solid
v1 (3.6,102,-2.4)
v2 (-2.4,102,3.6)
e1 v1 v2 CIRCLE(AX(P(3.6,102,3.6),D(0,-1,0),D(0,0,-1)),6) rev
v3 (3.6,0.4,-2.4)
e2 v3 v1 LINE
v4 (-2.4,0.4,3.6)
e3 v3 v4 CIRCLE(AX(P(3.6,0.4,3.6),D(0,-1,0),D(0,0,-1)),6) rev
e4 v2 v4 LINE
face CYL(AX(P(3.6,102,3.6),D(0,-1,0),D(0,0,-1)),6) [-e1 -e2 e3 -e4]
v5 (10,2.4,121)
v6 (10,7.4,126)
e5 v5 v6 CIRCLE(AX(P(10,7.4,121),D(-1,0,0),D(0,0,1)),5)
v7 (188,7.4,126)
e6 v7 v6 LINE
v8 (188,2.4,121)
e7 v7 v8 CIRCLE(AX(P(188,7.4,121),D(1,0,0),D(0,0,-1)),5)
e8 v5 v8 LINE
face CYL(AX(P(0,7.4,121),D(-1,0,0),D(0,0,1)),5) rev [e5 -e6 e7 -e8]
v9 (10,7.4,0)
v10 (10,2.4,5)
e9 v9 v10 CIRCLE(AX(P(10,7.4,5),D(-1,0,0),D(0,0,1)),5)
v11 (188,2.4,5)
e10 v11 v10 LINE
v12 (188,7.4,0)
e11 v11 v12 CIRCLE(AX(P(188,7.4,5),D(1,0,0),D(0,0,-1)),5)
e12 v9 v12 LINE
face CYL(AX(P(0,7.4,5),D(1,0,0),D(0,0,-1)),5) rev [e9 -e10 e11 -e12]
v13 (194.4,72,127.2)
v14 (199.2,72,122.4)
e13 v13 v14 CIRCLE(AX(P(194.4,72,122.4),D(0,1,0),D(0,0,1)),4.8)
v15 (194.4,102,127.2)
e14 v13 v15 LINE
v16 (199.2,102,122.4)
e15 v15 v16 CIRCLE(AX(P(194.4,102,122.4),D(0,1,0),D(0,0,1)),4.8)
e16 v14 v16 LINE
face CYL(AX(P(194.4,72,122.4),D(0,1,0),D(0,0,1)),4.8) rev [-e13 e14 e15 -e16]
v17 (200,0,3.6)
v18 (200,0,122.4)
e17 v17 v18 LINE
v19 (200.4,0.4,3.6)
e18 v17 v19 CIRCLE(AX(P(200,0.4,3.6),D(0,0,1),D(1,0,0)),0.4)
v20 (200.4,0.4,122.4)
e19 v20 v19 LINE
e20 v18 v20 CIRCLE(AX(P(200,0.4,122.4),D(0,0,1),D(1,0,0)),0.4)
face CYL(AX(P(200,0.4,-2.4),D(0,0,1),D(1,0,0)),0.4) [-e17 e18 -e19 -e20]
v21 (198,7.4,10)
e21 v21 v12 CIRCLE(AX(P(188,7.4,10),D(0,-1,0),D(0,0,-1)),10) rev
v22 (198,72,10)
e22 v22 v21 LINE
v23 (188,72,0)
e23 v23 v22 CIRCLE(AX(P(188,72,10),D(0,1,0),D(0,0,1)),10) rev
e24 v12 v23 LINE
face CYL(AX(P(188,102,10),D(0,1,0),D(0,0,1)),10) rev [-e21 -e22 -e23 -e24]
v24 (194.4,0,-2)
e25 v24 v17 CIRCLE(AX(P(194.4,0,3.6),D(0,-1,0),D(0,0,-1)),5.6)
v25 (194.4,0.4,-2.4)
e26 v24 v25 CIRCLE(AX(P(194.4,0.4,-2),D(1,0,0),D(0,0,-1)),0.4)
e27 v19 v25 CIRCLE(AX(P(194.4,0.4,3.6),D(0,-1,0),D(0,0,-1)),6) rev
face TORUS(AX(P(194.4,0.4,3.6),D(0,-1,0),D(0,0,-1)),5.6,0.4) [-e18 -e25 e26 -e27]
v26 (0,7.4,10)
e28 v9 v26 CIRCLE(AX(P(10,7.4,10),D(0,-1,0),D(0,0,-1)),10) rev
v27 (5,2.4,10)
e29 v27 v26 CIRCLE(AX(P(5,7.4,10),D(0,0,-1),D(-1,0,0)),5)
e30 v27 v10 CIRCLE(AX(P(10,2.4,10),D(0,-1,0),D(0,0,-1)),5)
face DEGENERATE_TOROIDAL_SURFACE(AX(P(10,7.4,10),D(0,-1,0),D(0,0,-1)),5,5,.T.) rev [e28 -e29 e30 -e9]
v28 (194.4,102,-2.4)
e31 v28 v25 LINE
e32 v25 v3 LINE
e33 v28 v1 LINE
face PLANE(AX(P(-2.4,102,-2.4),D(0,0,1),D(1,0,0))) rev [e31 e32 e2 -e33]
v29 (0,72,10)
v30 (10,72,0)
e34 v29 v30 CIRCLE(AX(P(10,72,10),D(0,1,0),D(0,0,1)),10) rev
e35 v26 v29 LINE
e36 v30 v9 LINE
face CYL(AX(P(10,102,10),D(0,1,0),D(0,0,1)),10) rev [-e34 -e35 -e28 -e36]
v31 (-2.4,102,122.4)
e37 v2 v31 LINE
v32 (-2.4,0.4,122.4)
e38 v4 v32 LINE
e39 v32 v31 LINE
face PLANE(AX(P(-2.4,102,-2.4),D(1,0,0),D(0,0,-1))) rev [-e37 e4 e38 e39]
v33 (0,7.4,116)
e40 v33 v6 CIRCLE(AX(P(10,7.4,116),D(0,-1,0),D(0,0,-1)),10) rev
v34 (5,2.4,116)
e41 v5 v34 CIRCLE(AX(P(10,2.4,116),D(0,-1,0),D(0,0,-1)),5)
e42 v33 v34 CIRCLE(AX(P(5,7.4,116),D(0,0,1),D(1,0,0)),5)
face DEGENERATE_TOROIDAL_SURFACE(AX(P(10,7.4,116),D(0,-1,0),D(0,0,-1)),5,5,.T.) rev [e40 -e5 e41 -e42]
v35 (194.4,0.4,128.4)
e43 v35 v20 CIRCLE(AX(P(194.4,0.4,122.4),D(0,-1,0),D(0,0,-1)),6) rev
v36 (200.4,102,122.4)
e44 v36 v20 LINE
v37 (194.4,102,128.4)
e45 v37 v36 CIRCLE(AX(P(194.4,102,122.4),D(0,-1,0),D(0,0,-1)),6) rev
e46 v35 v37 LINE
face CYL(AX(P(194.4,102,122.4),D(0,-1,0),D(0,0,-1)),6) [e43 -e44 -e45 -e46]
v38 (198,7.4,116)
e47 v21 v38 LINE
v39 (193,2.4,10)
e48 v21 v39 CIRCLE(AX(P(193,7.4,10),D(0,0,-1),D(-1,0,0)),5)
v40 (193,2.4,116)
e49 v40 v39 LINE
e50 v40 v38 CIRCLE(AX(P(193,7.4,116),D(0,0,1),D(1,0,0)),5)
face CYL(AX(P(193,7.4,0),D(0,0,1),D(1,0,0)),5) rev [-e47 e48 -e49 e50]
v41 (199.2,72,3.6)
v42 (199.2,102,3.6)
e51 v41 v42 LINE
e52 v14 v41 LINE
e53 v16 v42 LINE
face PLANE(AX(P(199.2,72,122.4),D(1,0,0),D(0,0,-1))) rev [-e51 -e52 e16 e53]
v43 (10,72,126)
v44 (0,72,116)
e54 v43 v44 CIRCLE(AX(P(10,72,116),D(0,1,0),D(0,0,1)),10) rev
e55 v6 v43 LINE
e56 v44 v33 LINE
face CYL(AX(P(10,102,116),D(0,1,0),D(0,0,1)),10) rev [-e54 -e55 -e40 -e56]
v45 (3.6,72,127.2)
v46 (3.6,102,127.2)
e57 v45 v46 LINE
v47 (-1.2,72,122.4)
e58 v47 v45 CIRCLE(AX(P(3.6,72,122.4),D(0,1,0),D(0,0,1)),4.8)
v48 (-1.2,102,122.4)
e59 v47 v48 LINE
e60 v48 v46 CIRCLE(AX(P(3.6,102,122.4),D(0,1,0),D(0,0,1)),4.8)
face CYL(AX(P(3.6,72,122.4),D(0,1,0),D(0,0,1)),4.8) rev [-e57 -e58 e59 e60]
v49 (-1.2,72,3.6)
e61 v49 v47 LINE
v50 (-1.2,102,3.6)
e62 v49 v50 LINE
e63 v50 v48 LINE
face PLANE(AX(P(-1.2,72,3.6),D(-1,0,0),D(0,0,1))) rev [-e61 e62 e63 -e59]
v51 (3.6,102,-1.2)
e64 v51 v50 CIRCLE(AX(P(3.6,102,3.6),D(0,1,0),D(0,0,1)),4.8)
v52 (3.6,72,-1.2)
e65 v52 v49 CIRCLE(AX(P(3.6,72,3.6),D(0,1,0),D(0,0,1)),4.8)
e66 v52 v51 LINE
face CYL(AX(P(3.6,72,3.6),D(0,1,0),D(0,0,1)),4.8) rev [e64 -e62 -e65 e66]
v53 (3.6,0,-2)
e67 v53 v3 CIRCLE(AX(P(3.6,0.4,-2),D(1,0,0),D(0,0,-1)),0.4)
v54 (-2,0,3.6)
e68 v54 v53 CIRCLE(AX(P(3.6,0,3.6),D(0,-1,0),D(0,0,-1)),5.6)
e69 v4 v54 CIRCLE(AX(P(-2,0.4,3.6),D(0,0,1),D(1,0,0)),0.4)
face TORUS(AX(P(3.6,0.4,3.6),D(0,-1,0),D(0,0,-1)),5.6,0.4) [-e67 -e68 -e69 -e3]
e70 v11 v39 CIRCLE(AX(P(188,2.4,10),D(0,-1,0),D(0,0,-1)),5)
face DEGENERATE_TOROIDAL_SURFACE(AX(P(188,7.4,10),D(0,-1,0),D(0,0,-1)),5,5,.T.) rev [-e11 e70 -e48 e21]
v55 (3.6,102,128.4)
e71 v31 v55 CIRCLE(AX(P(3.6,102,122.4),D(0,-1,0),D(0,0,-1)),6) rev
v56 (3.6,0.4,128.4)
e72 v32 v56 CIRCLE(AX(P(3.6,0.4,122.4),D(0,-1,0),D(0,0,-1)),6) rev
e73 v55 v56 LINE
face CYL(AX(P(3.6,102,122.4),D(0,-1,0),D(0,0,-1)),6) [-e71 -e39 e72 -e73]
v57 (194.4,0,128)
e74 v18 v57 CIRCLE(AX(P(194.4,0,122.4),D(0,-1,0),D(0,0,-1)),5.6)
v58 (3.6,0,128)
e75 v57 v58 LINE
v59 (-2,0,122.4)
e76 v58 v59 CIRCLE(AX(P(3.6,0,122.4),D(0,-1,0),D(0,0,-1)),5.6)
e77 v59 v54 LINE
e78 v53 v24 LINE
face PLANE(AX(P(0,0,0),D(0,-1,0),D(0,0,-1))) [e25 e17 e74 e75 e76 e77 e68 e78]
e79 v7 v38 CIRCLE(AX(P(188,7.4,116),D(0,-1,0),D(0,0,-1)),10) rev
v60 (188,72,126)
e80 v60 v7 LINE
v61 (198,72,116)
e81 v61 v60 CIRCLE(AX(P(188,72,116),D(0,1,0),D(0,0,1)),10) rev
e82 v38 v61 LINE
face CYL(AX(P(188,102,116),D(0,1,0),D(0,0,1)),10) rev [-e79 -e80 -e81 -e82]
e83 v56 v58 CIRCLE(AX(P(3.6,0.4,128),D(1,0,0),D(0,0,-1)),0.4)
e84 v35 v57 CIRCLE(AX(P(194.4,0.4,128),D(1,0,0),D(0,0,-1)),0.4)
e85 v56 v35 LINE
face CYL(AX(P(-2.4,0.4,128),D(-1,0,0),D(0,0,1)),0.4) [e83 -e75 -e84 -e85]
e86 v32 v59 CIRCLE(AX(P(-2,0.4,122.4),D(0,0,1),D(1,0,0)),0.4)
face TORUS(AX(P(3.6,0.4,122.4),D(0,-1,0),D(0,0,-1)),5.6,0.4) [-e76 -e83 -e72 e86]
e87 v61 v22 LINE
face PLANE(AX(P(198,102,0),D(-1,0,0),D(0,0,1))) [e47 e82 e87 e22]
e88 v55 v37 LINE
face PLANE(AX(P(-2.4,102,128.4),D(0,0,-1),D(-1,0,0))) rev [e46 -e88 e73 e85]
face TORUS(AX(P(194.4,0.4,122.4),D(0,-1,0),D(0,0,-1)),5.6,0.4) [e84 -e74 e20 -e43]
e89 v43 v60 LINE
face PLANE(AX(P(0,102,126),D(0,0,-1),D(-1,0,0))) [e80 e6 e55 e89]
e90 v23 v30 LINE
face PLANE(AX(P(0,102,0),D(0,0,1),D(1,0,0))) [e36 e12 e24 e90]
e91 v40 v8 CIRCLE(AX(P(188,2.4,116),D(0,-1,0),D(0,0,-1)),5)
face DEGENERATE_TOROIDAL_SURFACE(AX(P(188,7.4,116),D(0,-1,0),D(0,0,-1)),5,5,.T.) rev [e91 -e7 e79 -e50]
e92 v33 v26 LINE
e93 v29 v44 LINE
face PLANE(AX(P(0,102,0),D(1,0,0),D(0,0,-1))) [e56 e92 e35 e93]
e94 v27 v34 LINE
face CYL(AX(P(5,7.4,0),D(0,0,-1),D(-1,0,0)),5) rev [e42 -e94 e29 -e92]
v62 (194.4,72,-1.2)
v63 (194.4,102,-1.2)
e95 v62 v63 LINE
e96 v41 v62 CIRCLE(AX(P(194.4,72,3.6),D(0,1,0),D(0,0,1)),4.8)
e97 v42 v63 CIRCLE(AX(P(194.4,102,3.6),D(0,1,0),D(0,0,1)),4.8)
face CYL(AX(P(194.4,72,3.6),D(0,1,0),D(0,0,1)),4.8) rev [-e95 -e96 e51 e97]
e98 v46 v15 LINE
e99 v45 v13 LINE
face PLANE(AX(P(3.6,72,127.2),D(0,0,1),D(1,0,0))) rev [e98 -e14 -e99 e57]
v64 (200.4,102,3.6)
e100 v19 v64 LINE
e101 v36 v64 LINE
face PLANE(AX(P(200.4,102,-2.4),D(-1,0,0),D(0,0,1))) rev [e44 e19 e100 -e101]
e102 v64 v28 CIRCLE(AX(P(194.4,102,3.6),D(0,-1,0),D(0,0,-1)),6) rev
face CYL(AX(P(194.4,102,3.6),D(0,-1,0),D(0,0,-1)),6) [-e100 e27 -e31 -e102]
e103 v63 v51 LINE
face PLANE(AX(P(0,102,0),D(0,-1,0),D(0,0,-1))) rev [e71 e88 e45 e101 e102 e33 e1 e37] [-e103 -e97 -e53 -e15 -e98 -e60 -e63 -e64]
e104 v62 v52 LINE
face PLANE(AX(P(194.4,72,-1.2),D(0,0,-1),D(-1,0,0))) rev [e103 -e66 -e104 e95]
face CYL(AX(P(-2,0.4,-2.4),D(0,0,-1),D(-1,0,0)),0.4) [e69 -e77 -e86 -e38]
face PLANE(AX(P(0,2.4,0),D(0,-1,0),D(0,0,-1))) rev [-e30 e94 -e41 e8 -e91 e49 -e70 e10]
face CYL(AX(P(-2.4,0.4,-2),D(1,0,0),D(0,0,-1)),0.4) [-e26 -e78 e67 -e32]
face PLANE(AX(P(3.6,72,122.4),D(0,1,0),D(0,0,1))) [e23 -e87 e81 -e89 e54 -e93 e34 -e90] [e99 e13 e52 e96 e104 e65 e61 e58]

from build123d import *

# Parameters (mm, degrees)
SKETCH1_W           = 202.8
SKETCH1_H           = 130.8
SKETCH1_W_2         = 198
SKETCH1_H_2         = 126
BOSS_EXTRUDE1_DEPTH = 102
SKETCH3_W           = 198
SKETCH3_H           = 126
BOSS_EXTRUDE3_DEPTH = 2.4
FILLET1_R           = 5
FILLET4_R           = 10
FILLET2_R           = 6
FILLET3_R           = 0.4
CUT_EXTRUDE1_DEPTH  = 30


with BuildPart() as part:
    # Sketch1 → Boss-Extrude1 (new body)
    with BuildSketch(Plane(origin=(0, 0, 0), x_dir=(1, 0, 0), z_dir=(0, 1, 0))):
        with Locations((99, -63)):
            Rectangle(SKETCH1_W, SKETCH1_H)
        with Locations((99, -63)):
            Rectangle(SKETCH1_W_2, SKETCH1_H_2, mode=Mode.SUBTRACT)
    extrude(amount=BOSS_EXTRUDE1_DEPTH)

    # Sketch3 → Boss-Extrude3 (add)
    with BuildSketch(Plane(origin=(0, 0, 0), x_dir=(-1, 0, 0), z_dir=(0, -1, 0))):
        with Locations((-99, -63)):
            Rectangle(SKETCH3_W, SKETCH3_H)
    extrude(amount=-BOSS_EXTRUDE3_DEPTH)

    # Fillet1
    fillet1_edges = [part.edges().sort_by_distance(p)[0] for p in [
        (0, 2.4, 63),
        (99, 2.4, 126),
        (198, 2.4, 63),
        (99, 2.4, 0),
    ]]
    fillet(fillet1_edges, radius=FILLET1_R)

    # Fillet4
    # the kernel refuses this fillet: 10 mm, written as the material it adds along each edge
    with BuildSketch(Plane(origin=(10, 2.4, 10), x_dir=(-1, 0, 0), z_dir=(0, 0, 1))) as fillet4_piece_1:
        with BuildLine():
            CenterArc((5, -5), 5, 0, 90)
            Line((10, -5), (10, 0))
            Line((10, 0), (5, 0))
        make_face()
    revolve(axis=Axis((10, 2.4, 10), (0, -1, 0)), revolution_arc=90)
    with BuildSketch(Plane(origin=(10, 2.4, 116), x_dir=(0, 0, 1), z_dir=(1, 0, 0))) as fillet4_piece_2:
        with BuildLine():
            CenterArc((5, -5), 5, 0, 90)
            Line((10, -5), (10, 0))
            Line((10, 0), (5, 0))
        make_face()
    revolve(axis=Axis((10, 2.4, 116), (0, -1, 0)), revolution_arc=90)
    with BuildSketch(Plane(origin=(188, 2.4, 10), x_dir=(0, 0, -1), z_dir=(-1, 0, 0))) as fillet4_piece_3:
        with BuildLine():
            CenterArc((5, -5), 5, 0, 90)
            Line((10, -5), (10, 0))
            Line((10, 0), (5, 0))
        make_face()
    revolve(axis=Axis((188, 2.4, 10), (0, -1, 0)), revolution_arc=90)
    with BuildSketch(Plane(origin=(188, 2.4, 116), x_dir=(1, 0, 0), z_dir=(0, 0, -1))) as fillet4_piece_4:
        with BuildLine():
            CenterArc((5, -5), 5, 0, 90)
            Line((10, -5), (10, 0))
            Line((10, 0), (5, 0))
        make_face()
    revolve(axis=Axis((188, 2.4, 116), (0, -1, 0)), revolution_arc=90)
    with BuildSketch(Plane(origin=(0, 2.4, 0), x_dir=(1, 0, 0), z_dir=(0, 1, 0)), Plane(origin=(0, 2.4, 126), x_dir=(0, 0, -1), z_dir=(0, 1, 0))) as fillet4_piece_5:
        with BuildLine():
            CenterArc((FILLET4_R, -FILLET4_R), FILLET4_R, 90, 90)
            Line((0, -FILLET4_R), (0, 0))
            Line((0, 0), (FILLET4_R, 0))
        make_face()
    extrude(amount=99.6)
    with BuildSketch(Plane(origin=(198, 2.4, 126), x_dir=(0, 0, -1), z_dir=(0, 1, 0)), Plane(origin=(198, 2.4, 0), x_dir=(-1, 0, 0), z_dir=(0, 1, 0))) as fillet4_piece_6:
        with BuildLine():
            CenterArc((FILLET4_R, FILLET4_R), FILLET4_R, 180, 90)
            Line((0, FILLET4_R), (0, 0))
            Line((0, 0), (FILLET4_R, 0))
        make_face()
    extrude(amount=99.6)

    # Fillet2
    fillet2_edges = [part.edges().sort_by_distance(p)[0] for p in [
        (200.4, 51, -2.4),
        (200.4, 51, 128.4),
        (-2.4, 51, 128.4),
        (-2.4, 51, -2.4),
    ]]
    fillet(fillet2_edges, radius=FILLET2_R)

    # Fillet3
    fillet3_edges = [part.edges().sort_by_distance(p)[0] for p in [
        (99, 0, -2.4),
        (200.4, 0, 63),
        (-2.4, 0, 63),
        (198.642640687, 0, 126.642640687),
        (198.642640687, 0, -0.642640687),
        (-0.642640687, 0, -0.642640687),
        (-0.642640687, 0, 126.642640687),
        (99, 0, 128.4),
    ]]
    fillet(fillet3_edges, radius=FILLET3_R)

    # Sketch7 → Cut-Extrude1 (cut)
    with BuildSketch(Plane(origin=(0, 102, 0), x_dir=(1, 0, 0), z_dir=(0, 1, 0))):
        with BuildLine():
            Line((3.6, -127.2), (194.4, -127.2))
            ThreePointArc((194.4, -127.2), (197.79411255, -125.79411255), (199.2, -122.4))
            Line((199.2, -122.4), (199.2, -3.6))
            ThreePointArc((199.2, -3.6), (197.79411255, -0.20588745), (194.4, 1.2))
            Line((194.4, 1.2), (3.6, 1.2))
            ThreePointArc((3.6, 1.2), (0.20588745, -0.20588745), (-1.2, -3.6))
            Line((-1.2, -3.6), (-1.2, -122.4))
            ThreePointArc((-1.2, -122.4), (0.20588745, -125.79411255), (3.6, -127.2))
        make_face()
    extrude(amount=-CUT_EXTRUDE1_DEPTH, mode=Mode.SUBTRACT)


solid = part.part
